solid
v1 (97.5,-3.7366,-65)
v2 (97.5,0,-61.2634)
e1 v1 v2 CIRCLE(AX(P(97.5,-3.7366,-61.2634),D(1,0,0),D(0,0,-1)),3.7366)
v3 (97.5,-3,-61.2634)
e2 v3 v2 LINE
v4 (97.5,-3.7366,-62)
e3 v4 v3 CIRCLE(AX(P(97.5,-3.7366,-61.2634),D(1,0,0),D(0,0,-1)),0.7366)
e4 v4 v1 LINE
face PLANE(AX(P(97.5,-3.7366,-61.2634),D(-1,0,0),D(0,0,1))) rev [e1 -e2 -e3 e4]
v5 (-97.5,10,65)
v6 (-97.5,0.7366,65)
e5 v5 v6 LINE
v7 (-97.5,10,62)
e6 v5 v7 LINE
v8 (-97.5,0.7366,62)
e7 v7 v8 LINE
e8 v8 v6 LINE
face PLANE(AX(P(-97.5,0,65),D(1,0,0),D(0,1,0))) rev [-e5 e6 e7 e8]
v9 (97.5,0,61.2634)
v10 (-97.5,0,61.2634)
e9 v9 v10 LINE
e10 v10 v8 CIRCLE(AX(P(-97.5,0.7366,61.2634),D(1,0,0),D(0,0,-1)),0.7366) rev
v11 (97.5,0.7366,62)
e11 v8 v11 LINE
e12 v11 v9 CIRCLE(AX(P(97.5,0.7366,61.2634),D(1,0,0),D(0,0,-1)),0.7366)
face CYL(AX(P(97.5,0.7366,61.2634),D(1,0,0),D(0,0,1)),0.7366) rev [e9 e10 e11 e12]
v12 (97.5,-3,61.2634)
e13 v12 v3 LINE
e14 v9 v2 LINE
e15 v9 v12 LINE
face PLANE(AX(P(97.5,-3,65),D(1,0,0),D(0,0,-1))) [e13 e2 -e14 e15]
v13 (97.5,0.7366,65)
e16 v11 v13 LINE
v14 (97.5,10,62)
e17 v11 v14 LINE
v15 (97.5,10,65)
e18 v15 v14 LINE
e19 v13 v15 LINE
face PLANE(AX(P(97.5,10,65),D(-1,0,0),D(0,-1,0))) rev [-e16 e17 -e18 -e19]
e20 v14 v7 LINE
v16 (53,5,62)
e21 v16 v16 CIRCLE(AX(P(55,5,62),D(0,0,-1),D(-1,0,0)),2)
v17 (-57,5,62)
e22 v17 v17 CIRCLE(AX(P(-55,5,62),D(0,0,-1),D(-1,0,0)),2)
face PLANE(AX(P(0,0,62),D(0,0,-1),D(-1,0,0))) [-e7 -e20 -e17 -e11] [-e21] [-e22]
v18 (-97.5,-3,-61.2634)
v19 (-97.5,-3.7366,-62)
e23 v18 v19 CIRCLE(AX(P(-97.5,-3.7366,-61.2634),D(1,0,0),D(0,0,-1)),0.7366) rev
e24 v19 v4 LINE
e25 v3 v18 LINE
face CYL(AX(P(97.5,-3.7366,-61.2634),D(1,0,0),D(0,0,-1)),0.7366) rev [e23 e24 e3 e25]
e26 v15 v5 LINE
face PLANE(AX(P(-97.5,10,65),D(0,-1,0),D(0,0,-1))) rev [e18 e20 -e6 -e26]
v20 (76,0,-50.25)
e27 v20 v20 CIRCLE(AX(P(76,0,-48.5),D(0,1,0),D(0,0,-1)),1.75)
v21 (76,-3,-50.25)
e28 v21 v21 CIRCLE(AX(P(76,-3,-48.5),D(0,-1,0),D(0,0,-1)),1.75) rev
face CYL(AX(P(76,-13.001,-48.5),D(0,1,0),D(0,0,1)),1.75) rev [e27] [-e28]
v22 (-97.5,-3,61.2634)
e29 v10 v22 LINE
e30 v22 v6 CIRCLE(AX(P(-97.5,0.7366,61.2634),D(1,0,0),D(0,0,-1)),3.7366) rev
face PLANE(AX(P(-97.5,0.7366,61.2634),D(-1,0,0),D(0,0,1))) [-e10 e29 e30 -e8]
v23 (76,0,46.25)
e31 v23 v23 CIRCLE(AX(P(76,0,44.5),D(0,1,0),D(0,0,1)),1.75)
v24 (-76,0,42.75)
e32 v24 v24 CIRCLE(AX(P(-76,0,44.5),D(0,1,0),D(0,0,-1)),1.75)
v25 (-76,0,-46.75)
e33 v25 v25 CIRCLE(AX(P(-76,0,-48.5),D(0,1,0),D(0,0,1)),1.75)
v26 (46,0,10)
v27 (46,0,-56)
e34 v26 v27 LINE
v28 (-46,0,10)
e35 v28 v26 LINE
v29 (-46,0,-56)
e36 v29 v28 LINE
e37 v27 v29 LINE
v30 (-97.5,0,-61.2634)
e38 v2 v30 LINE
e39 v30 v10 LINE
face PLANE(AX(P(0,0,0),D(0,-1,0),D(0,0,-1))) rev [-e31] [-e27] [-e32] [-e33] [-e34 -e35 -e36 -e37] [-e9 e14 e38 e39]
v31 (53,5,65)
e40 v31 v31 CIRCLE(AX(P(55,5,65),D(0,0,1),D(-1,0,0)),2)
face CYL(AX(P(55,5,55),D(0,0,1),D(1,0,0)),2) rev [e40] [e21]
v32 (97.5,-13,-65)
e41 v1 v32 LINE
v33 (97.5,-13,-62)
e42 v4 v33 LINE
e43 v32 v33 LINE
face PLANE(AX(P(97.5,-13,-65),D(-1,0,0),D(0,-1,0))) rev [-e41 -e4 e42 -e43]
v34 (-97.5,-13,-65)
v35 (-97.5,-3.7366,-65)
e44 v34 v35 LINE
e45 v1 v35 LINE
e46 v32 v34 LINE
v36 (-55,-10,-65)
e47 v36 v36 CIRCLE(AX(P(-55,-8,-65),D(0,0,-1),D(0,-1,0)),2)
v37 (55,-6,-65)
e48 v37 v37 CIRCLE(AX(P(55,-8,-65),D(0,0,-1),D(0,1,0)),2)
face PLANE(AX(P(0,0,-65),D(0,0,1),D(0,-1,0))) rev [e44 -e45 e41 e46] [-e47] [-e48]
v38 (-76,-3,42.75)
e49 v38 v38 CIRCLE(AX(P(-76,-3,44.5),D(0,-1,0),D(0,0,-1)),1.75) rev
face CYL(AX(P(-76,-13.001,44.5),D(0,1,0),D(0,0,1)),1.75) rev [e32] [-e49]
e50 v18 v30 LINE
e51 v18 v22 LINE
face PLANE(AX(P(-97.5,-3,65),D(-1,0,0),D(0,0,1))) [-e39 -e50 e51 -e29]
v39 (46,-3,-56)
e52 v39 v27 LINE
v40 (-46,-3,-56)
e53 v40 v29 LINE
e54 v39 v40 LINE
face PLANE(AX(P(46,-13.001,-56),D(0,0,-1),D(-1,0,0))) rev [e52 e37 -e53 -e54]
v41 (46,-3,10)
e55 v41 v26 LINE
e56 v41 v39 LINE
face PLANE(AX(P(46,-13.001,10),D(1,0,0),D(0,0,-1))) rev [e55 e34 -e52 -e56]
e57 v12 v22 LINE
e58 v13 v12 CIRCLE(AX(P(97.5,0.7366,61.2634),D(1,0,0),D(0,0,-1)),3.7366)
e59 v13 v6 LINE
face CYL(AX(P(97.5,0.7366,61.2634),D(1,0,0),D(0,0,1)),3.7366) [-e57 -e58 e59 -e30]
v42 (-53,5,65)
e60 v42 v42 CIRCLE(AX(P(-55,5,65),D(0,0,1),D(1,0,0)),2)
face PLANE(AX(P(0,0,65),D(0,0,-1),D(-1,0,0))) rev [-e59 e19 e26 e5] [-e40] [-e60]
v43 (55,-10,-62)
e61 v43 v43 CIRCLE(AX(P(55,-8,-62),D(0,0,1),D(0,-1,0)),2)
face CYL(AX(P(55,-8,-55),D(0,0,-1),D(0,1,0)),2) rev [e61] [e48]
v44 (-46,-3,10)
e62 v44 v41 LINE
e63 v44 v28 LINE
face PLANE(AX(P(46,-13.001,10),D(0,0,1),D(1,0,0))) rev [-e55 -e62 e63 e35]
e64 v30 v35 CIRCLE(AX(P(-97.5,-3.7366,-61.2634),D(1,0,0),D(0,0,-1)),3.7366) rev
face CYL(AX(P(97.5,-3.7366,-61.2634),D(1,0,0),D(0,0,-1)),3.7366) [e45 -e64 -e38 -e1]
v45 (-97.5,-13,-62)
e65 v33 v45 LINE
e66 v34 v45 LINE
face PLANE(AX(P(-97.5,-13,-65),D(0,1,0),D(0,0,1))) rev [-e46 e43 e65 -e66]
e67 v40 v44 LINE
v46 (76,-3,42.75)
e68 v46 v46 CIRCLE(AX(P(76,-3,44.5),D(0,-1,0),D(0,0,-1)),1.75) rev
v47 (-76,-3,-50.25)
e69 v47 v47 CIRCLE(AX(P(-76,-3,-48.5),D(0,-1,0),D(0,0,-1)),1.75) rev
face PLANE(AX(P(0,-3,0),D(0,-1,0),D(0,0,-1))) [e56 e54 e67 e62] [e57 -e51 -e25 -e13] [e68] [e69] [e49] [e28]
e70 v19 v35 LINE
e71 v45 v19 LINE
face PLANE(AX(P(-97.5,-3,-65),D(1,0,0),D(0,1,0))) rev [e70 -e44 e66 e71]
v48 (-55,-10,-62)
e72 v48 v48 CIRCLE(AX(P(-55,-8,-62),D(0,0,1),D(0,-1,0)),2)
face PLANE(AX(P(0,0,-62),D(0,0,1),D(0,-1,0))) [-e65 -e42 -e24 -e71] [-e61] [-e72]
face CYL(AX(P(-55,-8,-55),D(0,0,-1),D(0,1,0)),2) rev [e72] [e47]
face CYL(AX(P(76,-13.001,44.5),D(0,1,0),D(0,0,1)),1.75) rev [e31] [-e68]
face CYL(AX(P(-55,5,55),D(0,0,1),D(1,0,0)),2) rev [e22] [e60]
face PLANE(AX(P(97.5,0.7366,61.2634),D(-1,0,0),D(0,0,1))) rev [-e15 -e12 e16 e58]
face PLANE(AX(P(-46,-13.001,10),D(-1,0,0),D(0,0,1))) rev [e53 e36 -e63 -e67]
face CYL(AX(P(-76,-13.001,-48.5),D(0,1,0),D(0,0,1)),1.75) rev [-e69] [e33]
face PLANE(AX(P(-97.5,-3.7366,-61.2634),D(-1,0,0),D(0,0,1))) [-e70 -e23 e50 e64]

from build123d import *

# Parameters (mm, degrees)
SKETCH_1_W                       = 195
SKETCH_1_H                       = 130
SM_BASE_FLANGE_1_DEPTH           = 3
SM_EDGE_FLANGE_1_STRIP_W         = 13.4732
SM_EDGE_FLANGE_1_STRIP_H         = 3
SM_EDGE_FLANGE_1_STRIP_CUT_DEPTH = 195
SM_EDGE_FLANGE_1_DEPTH           = 195
SM_EDGE_FLANGE_2_STRIP_W         = 13.4732
SM_EDGE_FLANGE_2_STRIP_H         = 3
SM_EDGE_FLANGE_2_STRIP_CUT_DEPTH = 195
SM_EDGE_FLANGE_2_DEPTH           = 195
SKETCH_12_R                      = 2
CUT_EXTRUDE_1_DEPTH              = 10
SKETCH_13_R                      = 2
CUT_EXTRUDE_2_DEPTH              = 10
CUT_EXTRUDE_3_REACH              = 119.899
SKETCH_14_R                      = 1.75
SKETCH_14_W                      = 92
SKETCH_14_H                      = 66


# Sheet-metal steps are written as plain solids
with BuildPart() as part:
    # Sketch 1 → 基体-法兰1 (new body)
    with BuildSketch(Plane(origin=(0, 0, 0), x_dir=(1, 0, 0), z_dir=(0, 1, 0))):
        Rectangle(SKETCH_1_W, SKETCH_1_H)
    extrude(amount=-SM_BASE_FLANGE_1_DEPTH)

    # 边线-法兰1 strip (across the edge) → 边线-法兰1 strip cut (cut)
    with BuildSketch(Plane(origin=(-97.5, 0, 65), x_dir=(0, 0, -1), z_dir=(1, 0, 0))):
        with Locations((-3, -1.5)):
            Rectangle(SM_EDGE_FLANGE_1_STRIP_W, SM_EDGE_FLANGE_1_STRIP_H)
    extrude(amount=SM_EDGE_FLANGE_1_STRIP_CUT_DEPTH, mode=Mode.SUBTRACT)

    # 边线-法兰1 section (across the edge) → 边线-法兰1 (add)
    with BuildSketch(Plane(origin=(-97.5, 0, 65), x_dir=(0, 0, -1), z_dir=(1, 0, 0))):
        with BuildLine():
            Line((0, 0.7366), (0, 10))
            Line((0, 10), (3, 10))
            Line((3, 10), (3, 0.7366))
            ThreePointArc((3, 0.7366), (3.215745145, 0.215745145), (3.7366, 0))
            Line((3.7366, 0), (3.7366, -3))
            ThreePointArc((3.7366, -3), (1.094424801, -1.905575199), (0, 0.7366))
        make_face()
    extrude(amount=SM_EDGE_FLANGE_1_DEPTH)

    # 边线-法兰2 strip (across the edge) → 边线-法兰2 strip cut (cut)
    with BuildSketch(Plane(origin=(-97.5, -3, -65), x_dir=(0, 0, 1), z_dir=(1, 0, 0))):
        with Locations((-3, -1.5)):
            Rectangle(SM_EDGE_FLANGE_2_STRIP_W, SM_EDGE_FLANGE_2_STRIP_H)
    extrude(amount=SM_EDGE_FLANGE_2_STRIP_CUT_DEPTH, mode=Mode.SUBTRACT)

    # 边线-法兰2 section (across the edge) → 边线-法兰2 (add)
    with BuildSketch(Plane(origin=(-97.5, -3, -65), x_dir=(0, 0, 1), z_dir=(1, 0, 0))):
        with BuildLine():
            Line((0, 0.7366), (0, 10))
            Line((0, 10), (3, 10))
            Line((3, 10), (3, 0.7366))
            ThreePointArc((3, 0.7366), (3.215745145, 0.215745145), (3.7366, 0))
            Line((3.7366, 0), (3.7366, -3))
            ThreePointArc((3.7366, -3), (1.094424801, -1.905575199), (0, 0.7366))
        make_face()
    extrude(amount=SM_EDGE_FLANGE_2_DEPTH)

    # 草图12 → 切除-拉伸1 (cut)
    with BuildSketch(Plane.XY.offset(65)):
        with Locations((-55, 5)):
            Circle(SKETCH_12_R)
        with Locations(Location((55, 5, 0), (0, 0, 180))):
            Circle(SKETCH_12_R)
    extrude(amount=-CUT_EXTRUDE_1_DEPTH, mode=Mode.SUBTRACT)

    # 草图13 → 切除-拉伸2 (cut)
    with BuildSketch(Plane(origin=(0, 0, -65), x_dir=(-1, 0, 0), z_dir=(0, 0, -1))):
        with Locations(Location((-55, -8, 0), (0, 0, 90))):
            Circle(SKETCH_13_R)
        with Locations(Location((55, -8, 0), (0, 0, 270))):
            Circle(SKETCH_13_R)
    extrude(amount=-CUT_EXTRUDE_2_DEPTH, mode=Mode.SUBTRACT)

    # 草图14 → 切除-拉伸3 (cut, up to next)
    with BuildSketch(Plane(origin=(0, 0, 0), x_dir=(1, 0, 0), z_dir=(0, 1, 0)), mode=Mode.PRIVATE) as cut_extrude_3_sk1:
        with Locations(Location((-76, 48.5, 0), (0, 0, 270))):
            Circle(SKETCH_14_R)
    cut_extrude_3_tool1 = extrude(cut_extrude_3_sk1.sketch, amount=-CUT_EXTRUDE_3_REACH, mode=Mode.PRIVATE) & part.part
    # 草图14 → 切除-拉伸3 (cut, up to next)
    with BuildSketch(Plane(origin=(0, 0, 0), x_dir=(1, 0, 0), z_dir=(0, 1, 0)), mode=Mode.PRIVATE) as cut_extrude_3_sk2:
        with Locations(Location((76, 48.5, 0), (0, 0, 90))):
            Circle(SKETCH_14_R)
    cut_extrude_3_tool2 = extrude(cut_extrude_3_sk2.sketch, amount=-CUT_EXTRUDE_3_REACH, mode=Mode.PRIVATE) & part.part
    # 草图14 → 切除-拉伸3 (cut, up to next)
    with BuildSketch(Plane(origin=(0, 0, 0), x_dir=(1, 0, 0), z_dir=(0, 1, 0)), mode=Mode.PRIVATE) as cut_extrude_3_sk3:
        with Locations(Location((76, -44.5, 0), (0, 0, 270))):
            Circle(SKETCH_14_R)
    cut_extrude_3_tool3 = extrude(cut_extrude_3_sk3.sketch, amount=-CUT_EXTRUDE_3_REACH, mode=Mode.PRIVATE) & part.part
    # 草图14 → 切除-拉伸3 (cut, up to next)
    with BuildSketch(Plane(origin=(0, 0, 0), x_dir=(1, 0, 0), z_dir=(0, 1, 0)), mode=Mode.PRIVATE) as cut_extrude_3_sk4:
        with Locations(Location((-76, -44.5, 0), (0, 0, 90))):
            Circle(SKETCH_14_R)
    cut_extrude_3_tool4 = extrude(cut_extrude_3_sk4.sketch, amount=-CUT_EXTRUDE_3_REACH, mode=Mode.PRIVATE) & part.part
    # 草图14 → 切除-拉伸3 (cut, up to next)
    with BuildSketch(Plane(origin=(0, 0, 0), x_dir=(1, 0, 0), z_dir=(0, 1, 0)), mode=Mode.PRIVATE) as cut_extrude_3_sk5:
        with Locations((0, 23)):
            Rectangle(SKETCH_14_W, SKETCH_14_H)
    cut_extrude_3_tool5 = extrude(cut_extrude_3_sk5.sketch, amount=-CUT_EXTRUDE_3_REACH, mode=Mode.PRIVATE) & part.part
    add(cut_extrude_3_tool1.solids().sort_by_distance((-76, 0, -48.5))[0], mode=Mode.SUBTRACT)
    add(cut_extrude_3_tool2.solids().sort_by_distance((76, 0, -48.5))[0], mode=Mode.SUBTRACT)
    add(cut_extrude_3_tool3.solids().sort_by_distance((76, 0, 44.5))[0], mode=Mode.SUBTRACT)
    add(cut_extrude_3_tool4.solids().sort_by_distance((-76, 0, 44.5))[0], mode=Mode.SUBTRACT)
    add(cut_extrude_3_tool5.solids().sort_by_distance((0, 0, -23))[0], mode=Mode.SUBTRACT)


solid = part.part
